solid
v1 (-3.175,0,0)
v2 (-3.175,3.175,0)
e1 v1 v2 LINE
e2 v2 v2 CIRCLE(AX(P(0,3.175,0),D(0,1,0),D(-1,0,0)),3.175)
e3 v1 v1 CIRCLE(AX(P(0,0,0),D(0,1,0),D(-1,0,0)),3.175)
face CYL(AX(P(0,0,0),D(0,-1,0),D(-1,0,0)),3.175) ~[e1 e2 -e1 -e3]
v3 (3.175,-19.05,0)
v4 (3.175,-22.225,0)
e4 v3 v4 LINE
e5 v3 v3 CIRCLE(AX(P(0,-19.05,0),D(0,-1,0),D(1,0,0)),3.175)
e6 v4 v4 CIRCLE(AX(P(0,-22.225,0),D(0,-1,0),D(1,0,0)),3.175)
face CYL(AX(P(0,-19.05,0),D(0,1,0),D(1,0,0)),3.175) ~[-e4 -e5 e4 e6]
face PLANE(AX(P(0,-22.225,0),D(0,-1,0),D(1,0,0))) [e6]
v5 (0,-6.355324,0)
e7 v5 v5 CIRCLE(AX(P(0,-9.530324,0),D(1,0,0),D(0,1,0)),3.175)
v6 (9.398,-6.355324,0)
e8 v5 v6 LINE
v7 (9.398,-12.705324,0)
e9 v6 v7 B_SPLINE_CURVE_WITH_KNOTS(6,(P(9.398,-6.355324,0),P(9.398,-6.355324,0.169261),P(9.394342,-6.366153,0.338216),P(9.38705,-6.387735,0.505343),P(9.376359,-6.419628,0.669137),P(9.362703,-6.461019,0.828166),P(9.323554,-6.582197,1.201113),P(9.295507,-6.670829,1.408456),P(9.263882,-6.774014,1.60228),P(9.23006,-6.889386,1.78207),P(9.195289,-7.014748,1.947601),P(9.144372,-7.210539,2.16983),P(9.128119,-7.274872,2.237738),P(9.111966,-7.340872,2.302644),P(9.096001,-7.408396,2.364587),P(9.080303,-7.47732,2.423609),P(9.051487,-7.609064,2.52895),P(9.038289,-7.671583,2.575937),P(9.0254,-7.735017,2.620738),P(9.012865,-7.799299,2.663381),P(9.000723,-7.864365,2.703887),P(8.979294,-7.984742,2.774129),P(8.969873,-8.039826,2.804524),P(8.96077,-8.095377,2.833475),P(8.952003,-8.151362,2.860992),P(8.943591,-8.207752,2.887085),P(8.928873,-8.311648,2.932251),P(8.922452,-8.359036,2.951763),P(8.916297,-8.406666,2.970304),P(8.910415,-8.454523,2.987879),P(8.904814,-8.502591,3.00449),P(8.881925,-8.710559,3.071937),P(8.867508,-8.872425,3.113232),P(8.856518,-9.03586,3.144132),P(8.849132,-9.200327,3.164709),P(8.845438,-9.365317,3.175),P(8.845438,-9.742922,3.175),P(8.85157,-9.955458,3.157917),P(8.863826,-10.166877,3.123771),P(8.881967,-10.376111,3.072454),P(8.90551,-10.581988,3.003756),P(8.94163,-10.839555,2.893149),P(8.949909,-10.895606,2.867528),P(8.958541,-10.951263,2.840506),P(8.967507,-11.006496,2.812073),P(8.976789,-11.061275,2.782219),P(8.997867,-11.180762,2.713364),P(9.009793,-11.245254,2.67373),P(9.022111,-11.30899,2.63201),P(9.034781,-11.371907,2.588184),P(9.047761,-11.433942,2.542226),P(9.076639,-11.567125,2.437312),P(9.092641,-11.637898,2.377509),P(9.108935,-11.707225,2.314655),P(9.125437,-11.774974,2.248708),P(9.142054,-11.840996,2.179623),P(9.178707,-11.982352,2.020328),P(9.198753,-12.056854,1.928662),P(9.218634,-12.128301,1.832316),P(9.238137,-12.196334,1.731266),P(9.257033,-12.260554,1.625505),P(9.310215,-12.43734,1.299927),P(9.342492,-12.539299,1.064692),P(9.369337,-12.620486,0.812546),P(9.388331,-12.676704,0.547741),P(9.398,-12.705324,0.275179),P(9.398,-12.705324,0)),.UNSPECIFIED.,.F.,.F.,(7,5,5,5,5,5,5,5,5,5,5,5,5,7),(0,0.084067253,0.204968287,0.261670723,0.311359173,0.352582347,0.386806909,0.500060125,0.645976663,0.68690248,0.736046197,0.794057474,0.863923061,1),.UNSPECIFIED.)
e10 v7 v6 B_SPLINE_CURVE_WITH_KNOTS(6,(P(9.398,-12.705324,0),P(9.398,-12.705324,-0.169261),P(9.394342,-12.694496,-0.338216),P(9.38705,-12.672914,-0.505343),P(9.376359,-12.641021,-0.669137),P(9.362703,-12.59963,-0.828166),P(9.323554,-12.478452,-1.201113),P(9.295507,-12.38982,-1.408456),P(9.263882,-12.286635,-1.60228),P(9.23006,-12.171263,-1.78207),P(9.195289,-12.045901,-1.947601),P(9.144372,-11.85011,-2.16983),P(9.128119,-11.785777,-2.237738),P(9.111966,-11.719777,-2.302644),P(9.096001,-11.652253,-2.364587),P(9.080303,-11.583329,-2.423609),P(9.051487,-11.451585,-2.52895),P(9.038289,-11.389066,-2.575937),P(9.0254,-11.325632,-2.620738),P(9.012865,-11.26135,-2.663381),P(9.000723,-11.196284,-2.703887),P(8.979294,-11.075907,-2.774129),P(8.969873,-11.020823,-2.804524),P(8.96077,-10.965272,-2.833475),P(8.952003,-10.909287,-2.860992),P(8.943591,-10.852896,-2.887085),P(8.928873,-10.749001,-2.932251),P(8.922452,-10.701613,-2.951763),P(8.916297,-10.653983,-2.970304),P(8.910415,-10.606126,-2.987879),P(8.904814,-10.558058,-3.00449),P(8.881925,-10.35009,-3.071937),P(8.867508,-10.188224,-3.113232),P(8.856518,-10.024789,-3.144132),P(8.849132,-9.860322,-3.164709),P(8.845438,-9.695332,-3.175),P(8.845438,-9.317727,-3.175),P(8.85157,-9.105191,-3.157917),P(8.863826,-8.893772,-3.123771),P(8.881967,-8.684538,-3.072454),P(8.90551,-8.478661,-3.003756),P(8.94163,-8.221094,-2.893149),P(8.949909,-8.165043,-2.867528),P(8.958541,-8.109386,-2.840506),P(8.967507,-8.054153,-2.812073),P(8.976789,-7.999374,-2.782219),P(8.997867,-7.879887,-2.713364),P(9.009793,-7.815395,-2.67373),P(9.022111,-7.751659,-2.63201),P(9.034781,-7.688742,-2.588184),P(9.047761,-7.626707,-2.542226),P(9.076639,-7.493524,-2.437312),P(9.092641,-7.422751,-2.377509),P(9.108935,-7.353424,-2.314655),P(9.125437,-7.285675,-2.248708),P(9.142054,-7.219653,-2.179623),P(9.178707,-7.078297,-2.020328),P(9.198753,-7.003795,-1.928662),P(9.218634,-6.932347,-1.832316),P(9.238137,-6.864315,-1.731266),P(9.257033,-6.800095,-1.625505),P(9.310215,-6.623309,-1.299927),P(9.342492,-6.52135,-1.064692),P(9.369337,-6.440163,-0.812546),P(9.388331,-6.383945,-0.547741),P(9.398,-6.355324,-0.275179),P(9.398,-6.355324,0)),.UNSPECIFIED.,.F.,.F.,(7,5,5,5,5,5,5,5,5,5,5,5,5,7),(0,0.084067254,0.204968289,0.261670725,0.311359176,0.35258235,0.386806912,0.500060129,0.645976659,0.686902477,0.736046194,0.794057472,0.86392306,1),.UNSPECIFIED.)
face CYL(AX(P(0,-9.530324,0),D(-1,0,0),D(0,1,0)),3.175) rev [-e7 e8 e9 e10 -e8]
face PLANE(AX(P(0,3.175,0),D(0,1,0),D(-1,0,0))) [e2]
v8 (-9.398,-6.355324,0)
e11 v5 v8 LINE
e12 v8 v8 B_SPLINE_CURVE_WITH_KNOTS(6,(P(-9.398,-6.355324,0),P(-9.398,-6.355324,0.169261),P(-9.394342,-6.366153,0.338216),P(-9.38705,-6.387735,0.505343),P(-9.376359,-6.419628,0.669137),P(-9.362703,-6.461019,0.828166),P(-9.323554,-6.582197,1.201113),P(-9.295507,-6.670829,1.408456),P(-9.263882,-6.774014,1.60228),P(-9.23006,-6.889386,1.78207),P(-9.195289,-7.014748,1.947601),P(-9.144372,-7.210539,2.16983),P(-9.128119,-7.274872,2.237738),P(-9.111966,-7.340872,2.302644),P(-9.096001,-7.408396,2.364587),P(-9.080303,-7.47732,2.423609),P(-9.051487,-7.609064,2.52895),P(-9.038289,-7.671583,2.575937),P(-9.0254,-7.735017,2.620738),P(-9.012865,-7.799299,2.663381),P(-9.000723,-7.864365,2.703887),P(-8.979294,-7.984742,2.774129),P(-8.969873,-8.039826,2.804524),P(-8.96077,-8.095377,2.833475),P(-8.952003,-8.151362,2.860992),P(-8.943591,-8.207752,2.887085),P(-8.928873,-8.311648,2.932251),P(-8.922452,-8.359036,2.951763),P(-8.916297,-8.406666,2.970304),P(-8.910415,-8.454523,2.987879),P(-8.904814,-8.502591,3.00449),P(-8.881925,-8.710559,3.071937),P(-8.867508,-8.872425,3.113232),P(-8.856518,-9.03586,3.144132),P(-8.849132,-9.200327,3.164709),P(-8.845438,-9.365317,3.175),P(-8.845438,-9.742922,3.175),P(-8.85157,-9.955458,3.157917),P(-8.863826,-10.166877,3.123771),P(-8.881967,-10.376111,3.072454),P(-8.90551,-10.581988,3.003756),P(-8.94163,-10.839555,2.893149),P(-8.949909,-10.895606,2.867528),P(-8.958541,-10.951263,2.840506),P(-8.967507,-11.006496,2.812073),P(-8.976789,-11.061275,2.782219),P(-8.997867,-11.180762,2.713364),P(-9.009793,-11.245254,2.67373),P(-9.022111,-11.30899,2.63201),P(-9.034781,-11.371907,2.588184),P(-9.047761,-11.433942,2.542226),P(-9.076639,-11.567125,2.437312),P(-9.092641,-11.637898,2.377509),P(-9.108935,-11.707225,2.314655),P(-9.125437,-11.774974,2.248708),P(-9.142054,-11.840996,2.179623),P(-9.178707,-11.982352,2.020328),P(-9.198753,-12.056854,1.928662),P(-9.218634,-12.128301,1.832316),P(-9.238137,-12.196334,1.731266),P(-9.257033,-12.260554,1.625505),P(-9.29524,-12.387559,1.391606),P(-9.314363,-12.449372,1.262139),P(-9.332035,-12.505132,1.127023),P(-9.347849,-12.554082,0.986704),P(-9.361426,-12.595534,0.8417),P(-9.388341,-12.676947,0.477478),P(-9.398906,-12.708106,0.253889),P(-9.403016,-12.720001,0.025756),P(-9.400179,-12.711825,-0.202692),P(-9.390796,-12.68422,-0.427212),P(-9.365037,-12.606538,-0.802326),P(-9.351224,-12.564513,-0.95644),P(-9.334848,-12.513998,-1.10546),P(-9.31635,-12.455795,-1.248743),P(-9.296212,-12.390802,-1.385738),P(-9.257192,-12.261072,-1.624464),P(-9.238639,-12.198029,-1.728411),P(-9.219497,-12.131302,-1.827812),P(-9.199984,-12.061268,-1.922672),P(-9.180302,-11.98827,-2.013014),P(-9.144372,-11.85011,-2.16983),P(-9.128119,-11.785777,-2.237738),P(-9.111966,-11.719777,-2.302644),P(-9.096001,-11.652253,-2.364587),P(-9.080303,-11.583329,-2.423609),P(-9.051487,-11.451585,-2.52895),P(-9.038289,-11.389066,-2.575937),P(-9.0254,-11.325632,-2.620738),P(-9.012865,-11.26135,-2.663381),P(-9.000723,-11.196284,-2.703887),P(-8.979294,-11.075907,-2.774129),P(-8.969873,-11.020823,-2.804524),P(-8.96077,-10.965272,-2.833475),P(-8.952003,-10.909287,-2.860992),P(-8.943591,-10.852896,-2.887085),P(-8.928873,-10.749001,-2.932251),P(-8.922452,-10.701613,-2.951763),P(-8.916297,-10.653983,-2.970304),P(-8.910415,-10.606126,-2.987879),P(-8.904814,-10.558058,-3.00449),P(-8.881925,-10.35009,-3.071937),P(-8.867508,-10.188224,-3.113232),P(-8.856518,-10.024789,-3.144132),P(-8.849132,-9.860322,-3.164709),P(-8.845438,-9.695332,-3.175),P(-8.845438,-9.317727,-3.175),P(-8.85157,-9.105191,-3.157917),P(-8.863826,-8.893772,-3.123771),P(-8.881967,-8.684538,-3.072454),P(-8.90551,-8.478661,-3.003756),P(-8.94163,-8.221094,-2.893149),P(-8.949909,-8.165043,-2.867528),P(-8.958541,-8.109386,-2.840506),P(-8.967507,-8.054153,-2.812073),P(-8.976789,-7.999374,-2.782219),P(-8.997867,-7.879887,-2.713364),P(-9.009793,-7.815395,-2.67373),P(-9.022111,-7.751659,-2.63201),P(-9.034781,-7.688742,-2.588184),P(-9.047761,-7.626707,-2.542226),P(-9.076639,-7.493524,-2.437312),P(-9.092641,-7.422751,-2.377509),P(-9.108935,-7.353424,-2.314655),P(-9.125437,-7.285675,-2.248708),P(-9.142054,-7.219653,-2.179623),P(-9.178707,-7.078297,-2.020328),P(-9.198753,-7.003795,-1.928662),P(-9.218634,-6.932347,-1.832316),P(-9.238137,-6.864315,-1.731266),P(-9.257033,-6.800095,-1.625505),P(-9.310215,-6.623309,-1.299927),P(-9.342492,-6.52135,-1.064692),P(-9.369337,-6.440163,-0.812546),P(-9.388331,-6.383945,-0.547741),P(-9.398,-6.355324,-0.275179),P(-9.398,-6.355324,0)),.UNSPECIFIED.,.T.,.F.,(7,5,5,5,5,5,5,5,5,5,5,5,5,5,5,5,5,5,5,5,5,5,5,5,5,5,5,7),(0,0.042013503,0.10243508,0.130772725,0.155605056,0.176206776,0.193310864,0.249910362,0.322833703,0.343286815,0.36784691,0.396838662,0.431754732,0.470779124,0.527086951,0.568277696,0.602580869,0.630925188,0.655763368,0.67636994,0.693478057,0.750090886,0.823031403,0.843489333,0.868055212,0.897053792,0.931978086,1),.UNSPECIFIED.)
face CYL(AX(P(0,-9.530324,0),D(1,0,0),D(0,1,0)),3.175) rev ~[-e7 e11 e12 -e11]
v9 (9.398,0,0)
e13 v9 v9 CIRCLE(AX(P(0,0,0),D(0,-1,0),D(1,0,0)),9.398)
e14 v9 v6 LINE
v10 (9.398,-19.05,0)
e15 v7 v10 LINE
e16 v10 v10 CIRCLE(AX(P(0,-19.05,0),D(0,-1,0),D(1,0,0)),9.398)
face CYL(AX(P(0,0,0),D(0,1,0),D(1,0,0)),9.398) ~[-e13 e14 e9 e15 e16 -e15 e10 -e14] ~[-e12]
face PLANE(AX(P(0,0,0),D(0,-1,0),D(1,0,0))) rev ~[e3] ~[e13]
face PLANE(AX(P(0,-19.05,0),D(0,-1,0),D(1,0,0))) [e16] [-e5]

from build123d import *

# Parameters (mm, degrees)
F0_R           = 9.398
F1_DEPTH       = 19.05
F2_R           = 3.175
F3_DEPTH       = 3.175
F4_R           = 3.175
F5_DEPTH       = 3.175
F6_R           = 3.175
F7_DEPTH       = 127
F10_DEPTH      = 25.4
F11_DEPTH      = 25.4
F11_DEPTH_BACK = 25.4


# Not quite as in the source:
# - a feature of the source that left no trace in its solid (it failed there, or was rolled back) is left out


with BuildPart() as f1:
    # F0 (on Front) → F1 (new body)
    with BuildSketch(Plane.XZ):
        Circle(F0_R)
    extrude(amount=F1_DEPTH)

    # F2 (on face) → F3 (join)
    with BuildSketch(Plane.XZ.offset(19.05)):
        Circle(F2_R)
    extrude(amount=F3_DEPTH)

    # F4 (on face) → F5 (join)
    with BuildSketch(Plane(origin=(0, 0, 0), x_dir=(-1, 0, 0), z_dir=(0, 1, 0))):
        Circle(F4_R)
    extrude(amount=F5_DEPTH)

    # F6 (on Right) → F7 (cut)
    with BuildSketch(Plane.YZ):
        with Locations((-9.5303244889, 0)):
            Circle(F6_R)
    extrude(amount=-F7_DEPTH, mode=Mode.SUBTRACT)

    # F6 (on Right) → F10 (cut)
    with BuildSketch(Plane.YZ):
        with Locations((-9.5303244889, 0)):
            Circle(F6_R)
    extrude(amount=-F10_DEPTH, mode=Mode.SUBTRACT)

    # F6 (on Right) → F11 (cut, two sides)
    with BuildSketch(Plane.YZ) as f11_sk:
        with Locations((-9.5303244889, 0)):
            Circle(F6_R)
    extrude(amount=-F11_DEPTH, mode=Mode.SUBTRACT)
    extrude(f11_sk.sketch, amount=F11_DEPTH_BACK, mode=Mode.SUBTRACT)


solid = f1.part
